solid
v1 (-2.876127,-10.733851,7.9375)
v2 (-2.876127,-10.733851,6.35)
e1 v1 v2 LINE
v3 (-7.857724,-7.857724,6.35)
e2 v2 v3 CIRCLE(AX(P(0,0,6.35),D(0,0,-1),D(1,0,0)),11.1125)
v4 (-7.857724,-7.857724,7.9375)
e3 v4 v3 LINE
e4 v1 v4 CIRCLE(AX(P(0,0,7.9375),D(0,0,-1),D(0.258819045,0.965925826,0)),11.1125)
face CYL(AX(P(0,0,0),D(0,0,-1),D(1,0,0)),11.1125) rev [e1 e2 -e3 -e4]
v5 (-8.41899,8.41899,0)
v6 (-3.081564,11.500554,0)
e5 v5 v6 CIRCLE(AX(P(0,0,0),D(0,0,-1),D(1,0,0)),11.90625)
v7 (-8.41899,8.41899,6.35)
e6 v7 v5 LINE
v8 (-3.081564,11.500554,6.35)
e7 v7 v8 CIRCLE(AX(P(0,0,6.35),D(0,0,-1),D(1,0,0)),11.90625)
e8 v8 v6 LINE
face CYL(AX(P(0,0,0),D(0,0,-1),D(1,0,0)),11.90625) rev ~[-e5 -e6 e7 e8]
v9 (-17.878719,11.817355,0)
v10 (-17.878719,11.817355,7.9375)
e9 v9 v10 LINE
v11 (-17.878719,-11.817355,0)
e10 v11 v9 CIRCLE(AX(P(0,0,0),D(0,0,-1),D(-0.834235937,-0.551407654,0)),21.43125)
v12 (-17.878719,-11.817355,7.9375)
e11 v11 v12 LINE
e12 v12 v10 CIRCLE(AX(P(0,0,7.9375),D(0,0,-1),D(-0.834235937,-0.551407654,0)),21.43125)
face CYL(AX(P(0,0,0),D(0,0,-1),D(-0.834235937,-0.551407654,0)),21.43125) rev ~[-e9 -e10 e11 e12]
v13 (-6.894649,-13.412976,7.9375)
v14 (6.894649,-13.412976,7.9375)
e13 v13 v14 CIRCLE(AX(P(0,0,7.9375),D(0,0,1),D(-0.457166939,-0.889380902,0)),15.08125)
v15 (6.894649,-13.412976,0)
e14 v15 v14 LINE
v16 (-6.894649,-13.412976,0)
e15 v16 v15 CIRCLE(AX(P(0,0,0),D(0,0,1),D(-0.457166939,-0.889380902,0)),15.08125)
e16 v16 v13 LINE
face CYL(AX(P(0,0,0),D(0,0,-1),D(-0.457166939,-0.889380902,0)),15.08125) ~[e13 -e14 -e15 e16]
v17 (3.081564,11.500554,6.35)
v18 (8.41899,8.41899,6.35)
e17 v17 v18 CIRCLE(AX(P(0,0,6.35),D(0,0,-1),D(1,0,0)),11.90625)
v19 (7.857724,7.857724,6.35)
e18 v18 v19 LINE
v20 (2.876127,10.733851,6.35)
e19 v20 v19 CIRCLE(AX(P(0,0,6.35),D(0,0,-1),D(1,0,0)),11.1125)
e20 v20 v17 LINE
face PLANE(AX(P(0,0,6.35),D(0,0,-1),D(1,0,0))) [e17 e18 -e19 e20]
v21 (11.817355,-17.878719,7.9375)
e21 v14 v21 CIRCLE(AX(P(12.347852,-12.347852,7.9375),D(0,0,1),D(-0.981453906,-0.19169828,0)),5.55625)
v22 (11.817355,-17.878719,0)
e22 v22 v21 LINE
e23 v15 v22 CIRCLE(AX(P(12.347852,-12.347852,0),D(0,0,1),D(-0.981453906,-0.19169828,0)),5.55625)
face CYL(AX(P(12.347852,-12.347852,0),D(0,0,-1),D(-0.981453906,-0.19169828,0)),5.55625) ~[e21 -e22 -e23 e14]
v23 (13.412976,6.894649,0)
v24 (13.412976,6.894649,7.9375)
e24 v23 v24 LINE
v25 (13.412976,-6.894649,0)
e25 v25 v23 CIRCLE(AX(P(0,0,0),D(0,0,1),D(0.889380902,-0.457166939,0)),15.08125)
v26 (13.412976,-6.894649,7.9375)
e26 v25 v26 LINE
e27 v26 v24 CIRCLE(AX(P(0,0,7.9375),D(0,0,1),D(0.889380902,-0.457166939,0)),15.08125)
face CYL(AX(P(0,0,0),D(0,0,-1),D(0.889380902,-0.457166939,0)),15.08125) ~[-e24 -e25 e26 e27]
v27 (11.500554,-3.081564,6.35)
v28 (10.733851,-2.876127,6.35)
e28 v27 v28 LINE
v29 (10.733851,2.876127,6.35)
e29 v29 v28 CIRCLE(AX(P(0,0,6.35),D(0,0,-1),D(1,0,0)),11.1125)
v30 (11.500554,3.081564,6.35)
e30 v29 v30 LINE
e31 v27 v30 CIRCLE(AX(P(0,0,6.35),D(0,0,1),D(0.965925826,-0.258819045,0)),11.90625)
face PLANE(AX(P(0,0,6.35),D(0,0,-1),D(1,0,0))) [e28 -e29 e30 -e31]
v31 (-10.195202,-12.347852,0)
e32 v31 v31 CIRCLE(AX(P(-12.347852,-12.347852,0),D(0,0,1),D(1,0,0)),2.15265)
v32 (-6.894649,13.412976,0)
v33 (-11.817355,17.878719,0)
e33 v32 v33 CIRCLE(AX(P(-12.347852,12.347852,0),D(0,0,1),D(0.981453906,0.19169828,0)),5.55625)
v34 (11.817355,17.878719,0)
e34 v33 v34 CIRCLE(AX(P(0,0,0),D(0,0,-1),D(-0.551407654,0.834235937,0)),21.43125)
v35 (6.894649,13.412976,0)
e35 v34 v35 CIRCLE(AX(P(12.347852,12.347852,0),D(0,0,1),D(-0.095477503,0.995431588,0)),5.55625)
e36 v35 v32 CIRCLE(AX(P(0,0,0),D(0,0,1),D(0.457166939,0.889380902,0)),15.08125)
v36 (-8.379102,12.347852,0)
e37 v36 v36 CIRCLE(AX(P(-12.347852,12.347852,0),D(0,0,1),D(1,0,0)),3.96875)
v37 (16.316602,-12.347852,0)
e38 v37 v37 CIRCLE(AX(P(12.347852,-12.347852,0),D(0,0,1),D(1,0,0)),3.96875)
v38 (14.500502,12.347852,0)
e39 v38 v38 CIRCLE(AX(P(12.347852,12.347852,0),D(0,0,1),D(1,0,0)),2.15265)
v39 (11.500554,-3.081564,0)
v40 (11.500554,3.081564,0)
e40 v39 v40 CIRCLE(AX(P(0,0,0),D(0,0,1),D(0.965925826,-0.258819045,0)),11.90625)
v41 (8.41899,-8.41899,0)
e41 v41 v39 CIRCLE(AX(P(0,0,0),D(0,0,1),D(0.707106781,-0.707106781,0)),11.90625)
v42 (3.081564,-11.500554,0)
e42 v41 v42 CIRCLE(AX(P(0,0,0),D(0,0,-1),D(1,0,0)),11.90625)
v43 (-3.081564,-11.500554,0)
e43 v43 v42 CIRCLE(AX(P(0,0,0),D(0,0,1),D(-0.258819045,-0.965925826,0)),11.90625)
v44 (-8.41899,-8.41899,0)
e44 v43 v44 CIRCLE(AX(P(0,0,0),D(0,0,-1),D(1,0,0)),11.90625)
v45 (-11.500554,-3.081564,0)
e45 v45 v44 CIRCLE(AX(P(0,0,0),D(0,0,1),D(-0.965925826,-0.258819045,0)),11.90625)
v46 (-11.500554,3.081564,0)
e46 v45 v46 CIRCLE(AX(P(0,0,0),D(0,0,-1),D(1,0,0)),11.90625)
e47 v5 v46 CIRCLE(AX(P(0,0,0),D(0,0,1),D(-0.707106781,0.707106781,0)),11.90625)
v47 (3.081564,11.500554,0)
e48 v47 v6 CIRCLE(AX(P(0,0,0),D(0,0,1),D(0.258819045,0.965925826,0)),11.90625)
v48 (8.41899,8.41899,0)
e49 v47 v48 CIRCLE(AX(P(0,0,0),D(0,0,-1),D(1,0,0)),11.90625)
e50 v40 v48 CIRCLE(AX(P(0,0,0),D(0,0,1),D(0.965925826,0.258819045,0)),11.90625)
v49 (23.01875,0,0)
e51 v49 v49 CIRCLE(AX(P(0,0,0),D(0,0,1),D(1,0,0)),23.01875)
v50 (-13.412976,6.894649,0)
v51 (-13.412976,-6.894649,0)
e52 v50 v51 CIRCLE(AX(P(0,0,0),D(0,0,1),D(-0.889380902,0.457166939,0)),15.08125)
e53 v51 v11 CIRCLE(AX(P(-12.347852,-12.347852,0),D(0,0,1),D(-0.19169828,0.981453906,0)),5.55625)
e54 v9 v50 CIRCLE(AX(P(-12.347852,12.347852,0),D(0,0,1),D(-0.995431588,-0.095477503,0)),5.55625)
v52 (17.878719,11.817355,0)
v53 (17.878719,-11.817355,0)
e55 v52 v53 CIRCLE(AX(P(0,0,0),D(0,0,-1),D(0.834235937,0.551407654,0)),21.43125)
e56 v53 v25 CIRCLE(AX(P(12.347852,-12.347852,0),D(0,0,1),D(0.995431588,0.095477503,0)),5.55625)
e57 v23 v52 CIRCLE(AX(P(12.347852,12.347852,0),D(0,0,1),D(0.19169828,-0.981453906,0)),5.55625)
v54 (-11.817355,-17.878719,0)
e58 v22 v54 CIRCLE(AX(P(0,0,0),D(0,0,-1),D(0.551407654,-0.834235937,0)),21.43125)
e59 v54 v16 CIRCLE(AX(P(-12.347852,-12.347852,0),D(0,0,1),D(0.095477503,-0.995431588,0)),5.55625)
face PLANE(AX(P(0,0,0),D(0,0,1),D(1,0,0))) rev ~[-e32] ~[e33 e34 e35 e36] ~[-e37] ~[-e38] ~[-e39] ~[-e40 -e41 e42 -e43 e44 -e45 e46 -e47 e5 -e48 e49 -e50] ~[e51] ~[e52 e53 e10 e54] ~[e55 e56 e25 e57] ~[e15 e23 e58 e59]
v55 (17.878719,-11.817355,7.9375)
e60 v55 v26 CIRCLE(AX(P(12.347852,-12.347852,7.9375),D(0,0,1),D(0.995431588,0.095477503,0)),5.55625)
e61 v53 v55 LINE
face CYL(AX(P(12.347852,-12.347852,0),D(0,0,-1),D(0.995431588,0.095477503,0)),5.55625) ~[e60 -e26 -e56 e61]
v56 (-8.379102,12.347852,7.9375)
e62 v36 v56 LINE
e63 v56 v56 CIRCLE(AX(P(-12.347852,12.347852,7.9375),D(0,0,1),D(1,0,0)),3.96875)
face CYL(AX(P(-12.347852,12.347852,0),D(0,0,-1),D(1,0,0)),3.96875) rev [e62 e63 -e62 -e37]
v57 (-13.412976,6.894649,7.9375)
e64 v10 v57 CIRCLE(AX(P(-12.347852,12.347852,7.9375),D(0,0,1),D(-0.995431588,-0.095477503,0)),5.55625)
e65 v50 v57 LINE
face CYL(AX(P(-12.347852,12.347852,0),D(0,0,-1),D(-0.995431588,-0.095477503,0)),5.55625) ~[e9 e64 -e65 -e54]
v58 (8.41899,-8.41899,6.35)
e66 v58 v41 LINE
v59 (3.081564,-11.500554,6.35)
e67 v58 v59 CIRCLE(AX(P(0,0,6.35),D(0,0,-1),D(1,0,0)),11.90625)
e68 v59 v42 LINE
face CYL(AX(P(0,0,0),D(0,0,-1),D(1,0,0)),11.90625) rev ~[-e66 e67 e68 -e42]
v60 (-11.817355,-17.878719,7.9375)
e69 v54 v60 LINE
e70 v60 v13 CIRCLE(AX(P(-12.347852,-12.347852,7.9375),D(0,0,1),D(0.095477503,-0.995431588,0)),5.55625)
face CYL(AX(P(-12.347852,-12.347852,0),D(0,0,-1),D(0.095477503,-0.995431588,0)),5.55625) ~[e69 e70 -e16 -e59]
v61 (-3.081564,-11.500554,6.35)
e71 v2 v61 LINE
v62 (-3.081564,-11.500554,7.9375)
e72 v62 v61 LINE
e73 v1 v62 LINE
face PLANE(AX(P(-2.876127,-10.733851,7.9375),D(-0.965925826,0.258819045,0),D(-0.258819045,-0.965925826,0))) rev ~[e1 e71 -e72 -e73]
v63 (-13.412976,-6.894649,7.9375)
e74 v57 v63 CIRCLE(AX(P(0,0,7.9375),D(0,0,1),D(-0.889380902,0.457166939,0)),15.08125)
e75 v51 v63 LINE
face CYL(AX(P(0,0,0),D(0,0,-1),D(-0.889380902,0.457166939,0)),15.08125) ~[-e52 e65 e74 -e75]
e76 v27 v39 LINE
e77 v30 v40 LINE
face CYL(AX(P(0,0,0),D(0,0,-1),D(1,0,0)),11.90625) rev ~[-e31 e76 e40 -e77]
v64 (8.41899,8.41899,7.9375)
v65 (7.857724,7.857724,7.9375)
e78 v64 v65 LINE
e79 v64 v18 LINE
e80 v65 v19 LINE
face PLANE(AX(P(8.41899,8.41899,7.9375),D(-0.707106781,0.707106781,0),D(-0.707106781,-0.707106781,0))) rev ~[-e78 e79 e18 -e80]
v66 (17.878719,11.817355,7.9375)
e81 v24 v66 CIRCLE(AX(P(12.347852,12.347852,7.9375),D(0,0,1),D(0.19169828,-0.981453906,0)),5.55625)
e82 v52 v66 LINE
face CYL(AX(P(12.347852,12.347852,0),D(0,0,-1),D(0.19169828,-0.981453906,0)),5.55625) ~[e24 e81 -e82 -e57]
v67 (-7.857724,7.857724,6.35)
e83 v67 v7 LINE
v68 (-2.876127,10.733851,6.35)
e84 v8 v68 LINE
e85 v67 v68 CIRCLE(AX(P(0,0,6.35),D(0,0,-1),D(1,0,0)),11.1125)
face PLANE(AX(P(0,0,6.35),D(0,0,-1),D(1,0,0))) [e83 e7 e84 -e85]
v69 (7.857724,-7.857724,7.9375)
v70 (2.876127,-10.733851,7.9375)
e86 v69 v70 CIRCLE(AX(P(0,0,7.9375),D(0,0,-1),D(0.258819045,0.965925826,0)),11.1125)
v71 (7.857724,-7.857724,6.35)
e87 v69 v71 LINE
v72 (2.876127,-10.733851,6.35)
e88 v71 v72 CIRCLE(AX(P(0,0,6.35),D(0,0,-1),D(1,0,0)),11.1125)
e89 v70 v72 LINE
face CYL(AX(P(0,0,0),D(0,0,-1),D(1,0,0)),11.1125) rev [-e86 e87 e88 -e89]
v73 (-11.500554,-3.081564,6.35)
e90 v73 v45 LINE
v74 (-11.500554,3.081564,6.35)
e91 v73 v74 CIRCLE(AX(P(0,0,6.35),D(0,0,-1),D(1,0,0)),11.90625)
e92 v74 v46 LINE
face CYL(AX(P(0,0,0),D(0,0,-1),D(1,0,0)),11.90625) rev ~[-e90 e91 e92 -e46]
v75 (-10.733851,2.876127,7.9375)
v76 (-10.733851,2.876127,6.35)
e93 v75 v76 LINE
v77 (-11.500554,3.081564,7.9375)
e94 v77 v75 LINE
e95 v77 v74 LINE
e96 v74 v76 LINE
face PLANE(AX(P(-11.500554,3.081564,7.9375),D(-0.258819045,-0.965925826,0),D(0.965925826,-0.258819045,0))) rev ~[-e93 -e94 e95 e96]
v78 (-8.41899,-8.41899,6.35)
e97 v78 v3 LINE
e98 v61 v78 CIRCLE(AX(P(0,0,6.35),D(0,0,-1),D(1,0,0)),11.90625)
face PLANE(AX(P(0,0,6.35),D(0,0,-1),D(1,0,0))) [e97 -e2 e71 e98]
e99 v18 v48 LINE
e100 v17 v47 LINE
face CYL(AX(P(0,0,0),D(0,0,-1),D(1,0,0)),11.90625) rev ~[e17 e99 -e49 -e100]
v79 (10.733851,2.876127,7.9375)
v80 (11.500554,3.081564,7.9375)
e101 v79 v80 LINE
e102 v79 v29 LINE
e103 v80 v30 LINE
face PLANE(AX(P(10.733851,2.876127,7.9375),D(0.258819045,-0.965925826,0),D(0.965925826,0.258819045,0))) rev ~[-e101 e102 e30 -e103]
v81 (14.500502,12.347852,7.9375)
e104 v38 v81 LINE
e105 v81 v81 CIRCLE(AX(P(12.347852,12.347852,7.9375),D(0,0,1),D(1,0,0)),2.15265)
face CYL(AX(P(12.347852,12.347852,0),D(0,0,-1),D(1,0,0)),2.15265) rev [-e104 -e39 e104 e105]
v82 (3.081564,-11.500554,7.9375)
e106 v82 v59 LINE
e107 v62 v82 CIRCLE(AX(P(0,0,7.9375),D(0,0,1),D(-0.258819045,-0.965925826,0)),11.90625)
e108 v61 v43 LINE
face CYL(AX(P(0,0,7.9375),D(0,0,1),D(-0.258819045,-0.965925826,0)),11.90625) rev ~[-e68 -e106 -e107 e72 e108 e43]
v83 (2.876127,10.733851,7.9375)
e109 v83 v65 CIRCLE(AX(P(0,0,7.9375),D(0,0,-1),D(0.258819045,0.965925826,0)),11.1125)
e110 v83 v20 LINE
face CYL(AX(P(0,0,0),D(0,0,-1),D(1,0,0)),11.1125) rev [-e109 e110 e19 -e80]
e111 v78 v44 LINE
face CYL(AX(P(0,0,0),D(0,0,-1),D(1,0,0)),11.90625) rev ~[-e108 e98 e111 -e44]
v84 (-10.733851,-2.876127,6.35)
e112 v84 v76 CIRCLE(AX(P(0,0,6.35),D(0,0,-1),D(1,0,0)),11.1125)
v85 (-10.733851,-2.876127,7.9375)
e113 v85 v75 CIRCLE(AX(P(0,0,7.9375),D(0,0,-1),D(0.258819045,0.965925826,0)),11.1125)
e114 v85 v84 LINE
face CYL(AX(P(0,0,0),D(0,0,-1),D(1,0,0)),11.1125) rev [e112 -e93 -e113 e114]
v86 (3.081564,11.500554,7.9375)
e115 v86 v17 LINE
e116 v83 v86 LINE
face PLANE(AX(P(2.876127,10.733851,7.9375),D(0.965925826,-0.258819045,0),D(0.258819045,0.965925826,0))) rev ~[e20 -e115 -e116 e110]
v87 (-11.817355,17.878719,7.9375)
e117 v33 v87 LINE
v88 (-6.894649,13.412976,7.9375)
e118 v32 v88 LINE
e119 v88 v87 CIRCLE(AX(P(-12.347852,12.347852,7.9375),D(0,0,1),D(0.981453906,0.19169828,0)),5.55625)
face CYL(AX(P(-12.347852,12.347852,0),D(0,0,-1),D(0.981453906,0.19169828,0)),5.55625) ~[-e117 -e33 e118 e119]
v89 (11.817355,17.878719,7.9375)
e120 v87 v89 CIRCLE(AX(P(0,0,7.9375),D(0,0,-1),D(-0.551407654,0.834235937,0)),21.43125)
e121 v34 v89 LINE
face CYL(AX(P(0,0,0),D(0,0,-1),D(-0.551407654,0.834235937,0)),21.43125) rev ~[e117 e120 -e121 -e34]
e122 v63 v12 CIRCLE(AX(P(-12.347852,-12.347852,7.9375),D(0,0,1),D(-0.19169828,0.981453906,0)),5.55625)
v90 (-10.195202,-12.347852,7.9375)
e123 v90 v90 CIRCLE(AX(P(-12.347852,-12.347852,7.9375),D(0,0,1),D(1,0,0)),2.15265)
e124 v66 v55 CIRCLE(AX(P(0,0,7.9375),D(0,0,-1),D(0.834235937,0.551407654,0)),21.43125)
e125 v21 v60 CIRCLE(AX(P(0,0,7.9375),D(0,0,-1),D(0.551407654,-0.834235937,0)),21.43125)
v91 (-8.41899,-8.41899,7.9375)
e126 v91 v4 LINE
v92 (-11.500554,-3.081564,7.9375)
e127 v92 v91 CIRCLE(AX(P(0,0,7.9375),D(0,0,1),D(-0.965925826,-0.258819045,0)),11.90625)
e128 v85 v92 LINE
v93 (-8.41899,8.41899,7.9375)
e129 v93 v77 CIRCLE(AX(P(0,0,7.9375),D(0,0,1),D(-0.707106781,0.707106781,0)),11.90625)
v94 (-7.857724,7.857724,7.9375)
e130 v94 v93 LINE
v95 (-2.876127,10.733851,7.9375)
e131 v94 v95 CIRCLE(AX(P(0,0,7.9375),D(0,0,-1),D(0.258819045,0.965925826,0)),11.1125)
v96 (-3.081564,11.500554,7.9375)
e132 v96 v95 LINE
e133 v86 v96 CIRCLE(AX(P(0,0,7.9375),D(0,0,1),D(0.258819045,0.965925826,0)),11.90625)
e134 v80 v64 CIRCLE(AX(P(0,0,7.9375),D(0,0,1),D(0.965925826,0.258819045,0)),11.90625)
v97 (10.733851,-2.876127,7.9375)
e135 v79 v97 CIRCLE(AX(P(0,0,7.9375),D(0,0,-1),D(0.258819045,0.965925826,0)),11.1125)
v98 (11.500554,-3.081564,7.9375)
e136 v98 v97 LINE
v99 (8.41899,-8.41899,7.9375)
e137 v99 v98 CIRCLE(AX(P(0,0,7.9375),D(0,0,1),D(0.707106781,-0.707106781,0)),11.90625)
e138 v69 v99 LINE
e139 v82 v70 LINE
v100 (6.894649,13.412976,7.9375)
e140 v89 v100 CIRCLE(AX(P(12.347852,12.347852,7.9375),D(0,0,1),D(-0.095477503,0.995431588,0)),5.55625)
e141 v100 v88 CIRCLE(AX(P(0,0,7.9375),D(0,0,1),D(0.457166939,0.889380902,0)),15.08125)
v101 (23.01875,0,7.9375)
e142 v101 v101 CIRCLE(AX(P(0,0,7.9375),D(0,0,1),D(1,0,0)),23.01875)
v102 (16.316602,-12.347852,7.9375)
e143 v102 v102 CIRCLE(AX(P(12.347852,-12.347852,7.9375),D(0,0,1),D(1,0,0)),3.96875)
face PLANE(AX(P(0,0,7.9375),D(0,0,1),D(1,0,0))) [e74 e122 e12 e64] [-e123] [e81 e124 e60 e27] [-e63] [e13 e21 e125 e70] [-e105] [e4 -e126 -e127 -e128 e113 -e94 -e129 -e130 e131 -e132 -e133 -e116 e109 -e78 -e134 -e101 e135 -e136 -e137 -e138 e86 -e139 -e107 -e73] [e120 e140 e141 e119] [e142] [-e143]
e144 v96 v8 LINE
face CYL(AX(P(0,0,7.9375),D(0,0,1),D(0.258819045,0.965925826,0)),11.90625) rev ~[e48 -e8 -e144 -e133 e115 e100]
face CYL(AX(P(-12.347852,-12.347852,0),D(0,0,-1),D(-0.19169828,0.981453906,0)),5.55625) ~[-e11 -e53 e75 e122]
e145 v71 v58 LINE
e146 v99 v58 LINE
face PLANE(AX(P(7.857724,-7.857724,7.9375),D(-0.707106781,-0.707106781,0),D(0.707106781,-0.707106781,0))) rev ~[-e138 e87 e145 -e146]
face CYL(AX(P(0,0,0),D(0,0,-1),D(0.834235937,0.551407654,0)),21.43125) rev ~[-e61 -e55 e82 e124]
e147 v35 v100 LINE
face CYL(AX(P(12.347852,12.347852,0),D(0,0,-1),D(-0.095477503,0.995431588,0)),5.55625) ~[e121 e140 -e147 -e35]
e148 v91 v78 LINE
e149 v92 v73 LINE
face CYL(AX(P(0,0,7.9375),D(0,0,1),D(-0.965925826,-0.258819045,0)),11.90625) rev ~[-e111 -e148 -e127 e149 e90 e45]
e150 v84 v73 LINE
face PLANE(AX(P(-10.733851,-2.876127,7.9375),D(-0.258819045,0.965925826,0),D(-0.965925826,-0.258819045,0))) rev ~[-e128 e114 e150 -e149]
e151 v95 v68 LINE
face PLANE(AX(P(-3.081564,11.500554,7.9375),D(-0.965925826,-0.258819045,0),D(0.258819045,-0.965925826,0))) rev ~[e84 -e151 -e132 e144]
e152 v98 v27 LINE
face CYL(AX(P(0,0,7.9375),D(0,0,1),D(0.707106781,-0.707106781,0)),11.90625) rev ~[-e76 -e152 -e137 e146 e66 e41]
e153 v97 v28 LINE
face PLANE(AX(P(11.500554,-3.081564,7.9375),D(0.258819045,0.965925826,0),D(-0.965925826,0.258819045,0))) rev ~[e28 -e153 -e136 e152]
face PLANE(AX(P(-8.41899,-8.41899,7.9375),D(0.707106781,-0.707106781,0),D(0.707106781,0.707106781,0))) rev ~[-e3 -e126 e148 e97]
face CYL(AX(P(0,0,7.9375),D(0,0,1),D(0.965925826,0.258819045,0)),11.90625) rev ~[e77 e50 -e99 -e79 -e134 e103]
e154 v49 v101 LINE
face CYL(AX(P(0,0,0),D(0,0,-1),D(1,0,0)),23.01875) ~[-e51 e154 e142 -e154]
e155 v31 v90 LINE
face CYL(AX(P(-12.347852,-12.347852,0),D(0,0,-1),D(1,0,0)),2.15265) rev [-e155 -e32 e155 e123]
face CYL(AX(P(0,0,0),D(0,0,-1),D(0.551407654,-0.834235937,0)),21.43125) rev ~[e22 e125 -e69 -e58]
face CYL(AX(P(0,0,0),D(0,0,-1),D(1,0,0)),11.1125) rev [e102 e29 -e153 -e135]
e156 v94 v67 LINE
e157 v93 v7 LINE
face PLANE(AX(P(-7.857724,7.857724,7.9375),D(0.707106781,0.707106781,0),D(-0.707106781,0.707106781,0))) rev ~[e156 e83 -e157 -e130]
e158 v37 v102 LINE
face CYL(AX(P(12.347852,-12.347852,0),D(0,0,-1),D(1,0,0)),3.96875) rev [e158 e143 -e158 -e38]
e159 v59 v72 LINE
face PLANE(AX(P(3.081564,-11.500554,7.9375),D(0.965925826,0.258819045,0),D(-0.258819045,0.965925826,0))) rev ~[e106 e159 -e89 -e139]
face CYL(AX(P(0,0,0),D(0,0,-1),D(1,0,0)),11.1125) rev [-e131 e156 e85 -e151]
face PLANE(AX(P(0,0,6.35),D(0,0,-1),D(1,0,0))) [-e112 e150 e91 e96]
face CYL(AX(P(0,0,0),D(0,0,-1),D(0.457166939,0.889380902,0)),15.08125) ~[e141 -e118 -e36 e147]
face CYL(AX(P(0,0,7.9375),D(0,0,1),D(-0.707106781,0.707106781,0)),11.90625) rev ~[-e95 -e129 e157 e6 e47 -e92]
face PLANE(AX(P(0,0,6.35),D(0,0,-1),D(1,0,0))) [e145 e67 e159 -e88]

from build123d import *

# Parameters (mm, degrees)
F0_R            = 23.01875
F0_R_2          = 2.15265
F0_R_3          = 3.96875
F0_R_4          = 11.1125
F1_DEPTH        = 7.9375
F3_DEPTH        = 7.9375
F4_COUNT        = 6
F4_ANGLE        = 300
F6_R            = 11.90625
F7_DEPTH        = 6.35
F9_DEPTH        = 7.9375
F9_COPIES_COUNT = 4


# Not quite as in the source:
# - a pattern or mirror of a feature is missing from the dataset's text; its kind, count and spacing are read off the source's solid


with BuildPart() as f1:
    # F0 (on Top) → F1 (new body)
    with BuildSketch(Plane.XY):
        Circle(F0_R)
        with Locations((-12.3478521665, -12.3478521665)):
            Circle(F0_R_2, mode=Mode.SUBTRACT)
        with Locations((12.3478521665, -12.3478521665)):
            Circle(F0_R_3, mode=Mode.SUBTRACT)
        with Locations((-12.3478521665, 12.3478521665)):
            Circle(F0_R_3, mode=Mode.SUBTRACT)
        Circle(F0_R_4, mode=Mode.SUBTRACT)
        with Locations((12.3478521665, 12.3478521665)):
            Circle(F0_R_2, mode=Mode.SUBTRACT)
    extrude(amount=F1_DEPTH)

    # F2 (on face) → F3 (cut, through all)
    with BuildSketch(Plane.XY.offset(7.9375)):
        with BuildLine():
            Line((-3.0815642558, 11.5005543693), (-2.8761266387, 10.7338507446))
            ThreePointArc((-2.8761266387, 10.7338507446), (0, 11.1125), (2.8761266387, 10.7338507446))
            Line((2.8761266387, 10.7338507446), (3.0815642558, 11.5005543693))
            ThreePointArc((3.0815642558, 11.5005543693), (0, 11.90625), (-3.0815642558, 11.5005543693))
        make_face()
    f3 = extrude(amount=-F3_DEPTH, mode=Mode.SUBTRACT)

    # F4: F3 ×6 about axis
    f4_axis = Axis((0, 0, 0), (0, 0, -1))
    for i in range(1, F4_COUNT):
        add(f3.rotate(f4_axis, i * F4_ANGLE / (F4_COUNT - 1)), mode=Mode.SUBTRACT)

    # F6 (on face) → F7 (cut, through all)
    with BuildSketch(Plane(origin=(0, 0, 0), x_dir=(1, 0, 0), z_dir=(0, 0, -1))):
        Circle(F6_R)
    extrude(amount=-F7_DEPTH, mode=Mode.SUBTRACT)

    # F8 (on face) → F9 (cut, through all)
    with BuildSketch(Plane(origin=(0, 0, 0), x_dir=(1, 0, 0), z_dir=(0, 0, -1))):
        with BuildLine():
            ThreePointArc((-13.4129757356, 6.8946489019), (-16.4630716815, 8.614638751), (-17.8787189274, 11.8173552911))
            ThreePointArc((-17.8787189274, 11.8173552911), (-21.43125, 0), (-17.8787189274, -11.8173552911))
            ThreePointArc((-17.8787189274, -11.8173552911), (-16.4630716815, -8.614638751), (-13.4129757356, -6.8946489019))
            ThreePointArc((-13.4129757356, -6.8946489019), (-15.08125, 0), (-13.4129757356, 6.8946489019))
        make_face()
    f9 = extrude(amount=-F9_DEPTH, mode=Mode.SUBTRACT)

    # F9_copies: F9 ×4 about axis
    f9_copies_axis = Axis((0, 0, 0), (0, 0, 1))
    for i in range(1, F9_COPIES_COUNT):
        add(f9.rotate(f9_copies_axis, i * 360 / F9_COPIES_COUNT), mode=Mode.SUBTRACT)


solid = f1.part
